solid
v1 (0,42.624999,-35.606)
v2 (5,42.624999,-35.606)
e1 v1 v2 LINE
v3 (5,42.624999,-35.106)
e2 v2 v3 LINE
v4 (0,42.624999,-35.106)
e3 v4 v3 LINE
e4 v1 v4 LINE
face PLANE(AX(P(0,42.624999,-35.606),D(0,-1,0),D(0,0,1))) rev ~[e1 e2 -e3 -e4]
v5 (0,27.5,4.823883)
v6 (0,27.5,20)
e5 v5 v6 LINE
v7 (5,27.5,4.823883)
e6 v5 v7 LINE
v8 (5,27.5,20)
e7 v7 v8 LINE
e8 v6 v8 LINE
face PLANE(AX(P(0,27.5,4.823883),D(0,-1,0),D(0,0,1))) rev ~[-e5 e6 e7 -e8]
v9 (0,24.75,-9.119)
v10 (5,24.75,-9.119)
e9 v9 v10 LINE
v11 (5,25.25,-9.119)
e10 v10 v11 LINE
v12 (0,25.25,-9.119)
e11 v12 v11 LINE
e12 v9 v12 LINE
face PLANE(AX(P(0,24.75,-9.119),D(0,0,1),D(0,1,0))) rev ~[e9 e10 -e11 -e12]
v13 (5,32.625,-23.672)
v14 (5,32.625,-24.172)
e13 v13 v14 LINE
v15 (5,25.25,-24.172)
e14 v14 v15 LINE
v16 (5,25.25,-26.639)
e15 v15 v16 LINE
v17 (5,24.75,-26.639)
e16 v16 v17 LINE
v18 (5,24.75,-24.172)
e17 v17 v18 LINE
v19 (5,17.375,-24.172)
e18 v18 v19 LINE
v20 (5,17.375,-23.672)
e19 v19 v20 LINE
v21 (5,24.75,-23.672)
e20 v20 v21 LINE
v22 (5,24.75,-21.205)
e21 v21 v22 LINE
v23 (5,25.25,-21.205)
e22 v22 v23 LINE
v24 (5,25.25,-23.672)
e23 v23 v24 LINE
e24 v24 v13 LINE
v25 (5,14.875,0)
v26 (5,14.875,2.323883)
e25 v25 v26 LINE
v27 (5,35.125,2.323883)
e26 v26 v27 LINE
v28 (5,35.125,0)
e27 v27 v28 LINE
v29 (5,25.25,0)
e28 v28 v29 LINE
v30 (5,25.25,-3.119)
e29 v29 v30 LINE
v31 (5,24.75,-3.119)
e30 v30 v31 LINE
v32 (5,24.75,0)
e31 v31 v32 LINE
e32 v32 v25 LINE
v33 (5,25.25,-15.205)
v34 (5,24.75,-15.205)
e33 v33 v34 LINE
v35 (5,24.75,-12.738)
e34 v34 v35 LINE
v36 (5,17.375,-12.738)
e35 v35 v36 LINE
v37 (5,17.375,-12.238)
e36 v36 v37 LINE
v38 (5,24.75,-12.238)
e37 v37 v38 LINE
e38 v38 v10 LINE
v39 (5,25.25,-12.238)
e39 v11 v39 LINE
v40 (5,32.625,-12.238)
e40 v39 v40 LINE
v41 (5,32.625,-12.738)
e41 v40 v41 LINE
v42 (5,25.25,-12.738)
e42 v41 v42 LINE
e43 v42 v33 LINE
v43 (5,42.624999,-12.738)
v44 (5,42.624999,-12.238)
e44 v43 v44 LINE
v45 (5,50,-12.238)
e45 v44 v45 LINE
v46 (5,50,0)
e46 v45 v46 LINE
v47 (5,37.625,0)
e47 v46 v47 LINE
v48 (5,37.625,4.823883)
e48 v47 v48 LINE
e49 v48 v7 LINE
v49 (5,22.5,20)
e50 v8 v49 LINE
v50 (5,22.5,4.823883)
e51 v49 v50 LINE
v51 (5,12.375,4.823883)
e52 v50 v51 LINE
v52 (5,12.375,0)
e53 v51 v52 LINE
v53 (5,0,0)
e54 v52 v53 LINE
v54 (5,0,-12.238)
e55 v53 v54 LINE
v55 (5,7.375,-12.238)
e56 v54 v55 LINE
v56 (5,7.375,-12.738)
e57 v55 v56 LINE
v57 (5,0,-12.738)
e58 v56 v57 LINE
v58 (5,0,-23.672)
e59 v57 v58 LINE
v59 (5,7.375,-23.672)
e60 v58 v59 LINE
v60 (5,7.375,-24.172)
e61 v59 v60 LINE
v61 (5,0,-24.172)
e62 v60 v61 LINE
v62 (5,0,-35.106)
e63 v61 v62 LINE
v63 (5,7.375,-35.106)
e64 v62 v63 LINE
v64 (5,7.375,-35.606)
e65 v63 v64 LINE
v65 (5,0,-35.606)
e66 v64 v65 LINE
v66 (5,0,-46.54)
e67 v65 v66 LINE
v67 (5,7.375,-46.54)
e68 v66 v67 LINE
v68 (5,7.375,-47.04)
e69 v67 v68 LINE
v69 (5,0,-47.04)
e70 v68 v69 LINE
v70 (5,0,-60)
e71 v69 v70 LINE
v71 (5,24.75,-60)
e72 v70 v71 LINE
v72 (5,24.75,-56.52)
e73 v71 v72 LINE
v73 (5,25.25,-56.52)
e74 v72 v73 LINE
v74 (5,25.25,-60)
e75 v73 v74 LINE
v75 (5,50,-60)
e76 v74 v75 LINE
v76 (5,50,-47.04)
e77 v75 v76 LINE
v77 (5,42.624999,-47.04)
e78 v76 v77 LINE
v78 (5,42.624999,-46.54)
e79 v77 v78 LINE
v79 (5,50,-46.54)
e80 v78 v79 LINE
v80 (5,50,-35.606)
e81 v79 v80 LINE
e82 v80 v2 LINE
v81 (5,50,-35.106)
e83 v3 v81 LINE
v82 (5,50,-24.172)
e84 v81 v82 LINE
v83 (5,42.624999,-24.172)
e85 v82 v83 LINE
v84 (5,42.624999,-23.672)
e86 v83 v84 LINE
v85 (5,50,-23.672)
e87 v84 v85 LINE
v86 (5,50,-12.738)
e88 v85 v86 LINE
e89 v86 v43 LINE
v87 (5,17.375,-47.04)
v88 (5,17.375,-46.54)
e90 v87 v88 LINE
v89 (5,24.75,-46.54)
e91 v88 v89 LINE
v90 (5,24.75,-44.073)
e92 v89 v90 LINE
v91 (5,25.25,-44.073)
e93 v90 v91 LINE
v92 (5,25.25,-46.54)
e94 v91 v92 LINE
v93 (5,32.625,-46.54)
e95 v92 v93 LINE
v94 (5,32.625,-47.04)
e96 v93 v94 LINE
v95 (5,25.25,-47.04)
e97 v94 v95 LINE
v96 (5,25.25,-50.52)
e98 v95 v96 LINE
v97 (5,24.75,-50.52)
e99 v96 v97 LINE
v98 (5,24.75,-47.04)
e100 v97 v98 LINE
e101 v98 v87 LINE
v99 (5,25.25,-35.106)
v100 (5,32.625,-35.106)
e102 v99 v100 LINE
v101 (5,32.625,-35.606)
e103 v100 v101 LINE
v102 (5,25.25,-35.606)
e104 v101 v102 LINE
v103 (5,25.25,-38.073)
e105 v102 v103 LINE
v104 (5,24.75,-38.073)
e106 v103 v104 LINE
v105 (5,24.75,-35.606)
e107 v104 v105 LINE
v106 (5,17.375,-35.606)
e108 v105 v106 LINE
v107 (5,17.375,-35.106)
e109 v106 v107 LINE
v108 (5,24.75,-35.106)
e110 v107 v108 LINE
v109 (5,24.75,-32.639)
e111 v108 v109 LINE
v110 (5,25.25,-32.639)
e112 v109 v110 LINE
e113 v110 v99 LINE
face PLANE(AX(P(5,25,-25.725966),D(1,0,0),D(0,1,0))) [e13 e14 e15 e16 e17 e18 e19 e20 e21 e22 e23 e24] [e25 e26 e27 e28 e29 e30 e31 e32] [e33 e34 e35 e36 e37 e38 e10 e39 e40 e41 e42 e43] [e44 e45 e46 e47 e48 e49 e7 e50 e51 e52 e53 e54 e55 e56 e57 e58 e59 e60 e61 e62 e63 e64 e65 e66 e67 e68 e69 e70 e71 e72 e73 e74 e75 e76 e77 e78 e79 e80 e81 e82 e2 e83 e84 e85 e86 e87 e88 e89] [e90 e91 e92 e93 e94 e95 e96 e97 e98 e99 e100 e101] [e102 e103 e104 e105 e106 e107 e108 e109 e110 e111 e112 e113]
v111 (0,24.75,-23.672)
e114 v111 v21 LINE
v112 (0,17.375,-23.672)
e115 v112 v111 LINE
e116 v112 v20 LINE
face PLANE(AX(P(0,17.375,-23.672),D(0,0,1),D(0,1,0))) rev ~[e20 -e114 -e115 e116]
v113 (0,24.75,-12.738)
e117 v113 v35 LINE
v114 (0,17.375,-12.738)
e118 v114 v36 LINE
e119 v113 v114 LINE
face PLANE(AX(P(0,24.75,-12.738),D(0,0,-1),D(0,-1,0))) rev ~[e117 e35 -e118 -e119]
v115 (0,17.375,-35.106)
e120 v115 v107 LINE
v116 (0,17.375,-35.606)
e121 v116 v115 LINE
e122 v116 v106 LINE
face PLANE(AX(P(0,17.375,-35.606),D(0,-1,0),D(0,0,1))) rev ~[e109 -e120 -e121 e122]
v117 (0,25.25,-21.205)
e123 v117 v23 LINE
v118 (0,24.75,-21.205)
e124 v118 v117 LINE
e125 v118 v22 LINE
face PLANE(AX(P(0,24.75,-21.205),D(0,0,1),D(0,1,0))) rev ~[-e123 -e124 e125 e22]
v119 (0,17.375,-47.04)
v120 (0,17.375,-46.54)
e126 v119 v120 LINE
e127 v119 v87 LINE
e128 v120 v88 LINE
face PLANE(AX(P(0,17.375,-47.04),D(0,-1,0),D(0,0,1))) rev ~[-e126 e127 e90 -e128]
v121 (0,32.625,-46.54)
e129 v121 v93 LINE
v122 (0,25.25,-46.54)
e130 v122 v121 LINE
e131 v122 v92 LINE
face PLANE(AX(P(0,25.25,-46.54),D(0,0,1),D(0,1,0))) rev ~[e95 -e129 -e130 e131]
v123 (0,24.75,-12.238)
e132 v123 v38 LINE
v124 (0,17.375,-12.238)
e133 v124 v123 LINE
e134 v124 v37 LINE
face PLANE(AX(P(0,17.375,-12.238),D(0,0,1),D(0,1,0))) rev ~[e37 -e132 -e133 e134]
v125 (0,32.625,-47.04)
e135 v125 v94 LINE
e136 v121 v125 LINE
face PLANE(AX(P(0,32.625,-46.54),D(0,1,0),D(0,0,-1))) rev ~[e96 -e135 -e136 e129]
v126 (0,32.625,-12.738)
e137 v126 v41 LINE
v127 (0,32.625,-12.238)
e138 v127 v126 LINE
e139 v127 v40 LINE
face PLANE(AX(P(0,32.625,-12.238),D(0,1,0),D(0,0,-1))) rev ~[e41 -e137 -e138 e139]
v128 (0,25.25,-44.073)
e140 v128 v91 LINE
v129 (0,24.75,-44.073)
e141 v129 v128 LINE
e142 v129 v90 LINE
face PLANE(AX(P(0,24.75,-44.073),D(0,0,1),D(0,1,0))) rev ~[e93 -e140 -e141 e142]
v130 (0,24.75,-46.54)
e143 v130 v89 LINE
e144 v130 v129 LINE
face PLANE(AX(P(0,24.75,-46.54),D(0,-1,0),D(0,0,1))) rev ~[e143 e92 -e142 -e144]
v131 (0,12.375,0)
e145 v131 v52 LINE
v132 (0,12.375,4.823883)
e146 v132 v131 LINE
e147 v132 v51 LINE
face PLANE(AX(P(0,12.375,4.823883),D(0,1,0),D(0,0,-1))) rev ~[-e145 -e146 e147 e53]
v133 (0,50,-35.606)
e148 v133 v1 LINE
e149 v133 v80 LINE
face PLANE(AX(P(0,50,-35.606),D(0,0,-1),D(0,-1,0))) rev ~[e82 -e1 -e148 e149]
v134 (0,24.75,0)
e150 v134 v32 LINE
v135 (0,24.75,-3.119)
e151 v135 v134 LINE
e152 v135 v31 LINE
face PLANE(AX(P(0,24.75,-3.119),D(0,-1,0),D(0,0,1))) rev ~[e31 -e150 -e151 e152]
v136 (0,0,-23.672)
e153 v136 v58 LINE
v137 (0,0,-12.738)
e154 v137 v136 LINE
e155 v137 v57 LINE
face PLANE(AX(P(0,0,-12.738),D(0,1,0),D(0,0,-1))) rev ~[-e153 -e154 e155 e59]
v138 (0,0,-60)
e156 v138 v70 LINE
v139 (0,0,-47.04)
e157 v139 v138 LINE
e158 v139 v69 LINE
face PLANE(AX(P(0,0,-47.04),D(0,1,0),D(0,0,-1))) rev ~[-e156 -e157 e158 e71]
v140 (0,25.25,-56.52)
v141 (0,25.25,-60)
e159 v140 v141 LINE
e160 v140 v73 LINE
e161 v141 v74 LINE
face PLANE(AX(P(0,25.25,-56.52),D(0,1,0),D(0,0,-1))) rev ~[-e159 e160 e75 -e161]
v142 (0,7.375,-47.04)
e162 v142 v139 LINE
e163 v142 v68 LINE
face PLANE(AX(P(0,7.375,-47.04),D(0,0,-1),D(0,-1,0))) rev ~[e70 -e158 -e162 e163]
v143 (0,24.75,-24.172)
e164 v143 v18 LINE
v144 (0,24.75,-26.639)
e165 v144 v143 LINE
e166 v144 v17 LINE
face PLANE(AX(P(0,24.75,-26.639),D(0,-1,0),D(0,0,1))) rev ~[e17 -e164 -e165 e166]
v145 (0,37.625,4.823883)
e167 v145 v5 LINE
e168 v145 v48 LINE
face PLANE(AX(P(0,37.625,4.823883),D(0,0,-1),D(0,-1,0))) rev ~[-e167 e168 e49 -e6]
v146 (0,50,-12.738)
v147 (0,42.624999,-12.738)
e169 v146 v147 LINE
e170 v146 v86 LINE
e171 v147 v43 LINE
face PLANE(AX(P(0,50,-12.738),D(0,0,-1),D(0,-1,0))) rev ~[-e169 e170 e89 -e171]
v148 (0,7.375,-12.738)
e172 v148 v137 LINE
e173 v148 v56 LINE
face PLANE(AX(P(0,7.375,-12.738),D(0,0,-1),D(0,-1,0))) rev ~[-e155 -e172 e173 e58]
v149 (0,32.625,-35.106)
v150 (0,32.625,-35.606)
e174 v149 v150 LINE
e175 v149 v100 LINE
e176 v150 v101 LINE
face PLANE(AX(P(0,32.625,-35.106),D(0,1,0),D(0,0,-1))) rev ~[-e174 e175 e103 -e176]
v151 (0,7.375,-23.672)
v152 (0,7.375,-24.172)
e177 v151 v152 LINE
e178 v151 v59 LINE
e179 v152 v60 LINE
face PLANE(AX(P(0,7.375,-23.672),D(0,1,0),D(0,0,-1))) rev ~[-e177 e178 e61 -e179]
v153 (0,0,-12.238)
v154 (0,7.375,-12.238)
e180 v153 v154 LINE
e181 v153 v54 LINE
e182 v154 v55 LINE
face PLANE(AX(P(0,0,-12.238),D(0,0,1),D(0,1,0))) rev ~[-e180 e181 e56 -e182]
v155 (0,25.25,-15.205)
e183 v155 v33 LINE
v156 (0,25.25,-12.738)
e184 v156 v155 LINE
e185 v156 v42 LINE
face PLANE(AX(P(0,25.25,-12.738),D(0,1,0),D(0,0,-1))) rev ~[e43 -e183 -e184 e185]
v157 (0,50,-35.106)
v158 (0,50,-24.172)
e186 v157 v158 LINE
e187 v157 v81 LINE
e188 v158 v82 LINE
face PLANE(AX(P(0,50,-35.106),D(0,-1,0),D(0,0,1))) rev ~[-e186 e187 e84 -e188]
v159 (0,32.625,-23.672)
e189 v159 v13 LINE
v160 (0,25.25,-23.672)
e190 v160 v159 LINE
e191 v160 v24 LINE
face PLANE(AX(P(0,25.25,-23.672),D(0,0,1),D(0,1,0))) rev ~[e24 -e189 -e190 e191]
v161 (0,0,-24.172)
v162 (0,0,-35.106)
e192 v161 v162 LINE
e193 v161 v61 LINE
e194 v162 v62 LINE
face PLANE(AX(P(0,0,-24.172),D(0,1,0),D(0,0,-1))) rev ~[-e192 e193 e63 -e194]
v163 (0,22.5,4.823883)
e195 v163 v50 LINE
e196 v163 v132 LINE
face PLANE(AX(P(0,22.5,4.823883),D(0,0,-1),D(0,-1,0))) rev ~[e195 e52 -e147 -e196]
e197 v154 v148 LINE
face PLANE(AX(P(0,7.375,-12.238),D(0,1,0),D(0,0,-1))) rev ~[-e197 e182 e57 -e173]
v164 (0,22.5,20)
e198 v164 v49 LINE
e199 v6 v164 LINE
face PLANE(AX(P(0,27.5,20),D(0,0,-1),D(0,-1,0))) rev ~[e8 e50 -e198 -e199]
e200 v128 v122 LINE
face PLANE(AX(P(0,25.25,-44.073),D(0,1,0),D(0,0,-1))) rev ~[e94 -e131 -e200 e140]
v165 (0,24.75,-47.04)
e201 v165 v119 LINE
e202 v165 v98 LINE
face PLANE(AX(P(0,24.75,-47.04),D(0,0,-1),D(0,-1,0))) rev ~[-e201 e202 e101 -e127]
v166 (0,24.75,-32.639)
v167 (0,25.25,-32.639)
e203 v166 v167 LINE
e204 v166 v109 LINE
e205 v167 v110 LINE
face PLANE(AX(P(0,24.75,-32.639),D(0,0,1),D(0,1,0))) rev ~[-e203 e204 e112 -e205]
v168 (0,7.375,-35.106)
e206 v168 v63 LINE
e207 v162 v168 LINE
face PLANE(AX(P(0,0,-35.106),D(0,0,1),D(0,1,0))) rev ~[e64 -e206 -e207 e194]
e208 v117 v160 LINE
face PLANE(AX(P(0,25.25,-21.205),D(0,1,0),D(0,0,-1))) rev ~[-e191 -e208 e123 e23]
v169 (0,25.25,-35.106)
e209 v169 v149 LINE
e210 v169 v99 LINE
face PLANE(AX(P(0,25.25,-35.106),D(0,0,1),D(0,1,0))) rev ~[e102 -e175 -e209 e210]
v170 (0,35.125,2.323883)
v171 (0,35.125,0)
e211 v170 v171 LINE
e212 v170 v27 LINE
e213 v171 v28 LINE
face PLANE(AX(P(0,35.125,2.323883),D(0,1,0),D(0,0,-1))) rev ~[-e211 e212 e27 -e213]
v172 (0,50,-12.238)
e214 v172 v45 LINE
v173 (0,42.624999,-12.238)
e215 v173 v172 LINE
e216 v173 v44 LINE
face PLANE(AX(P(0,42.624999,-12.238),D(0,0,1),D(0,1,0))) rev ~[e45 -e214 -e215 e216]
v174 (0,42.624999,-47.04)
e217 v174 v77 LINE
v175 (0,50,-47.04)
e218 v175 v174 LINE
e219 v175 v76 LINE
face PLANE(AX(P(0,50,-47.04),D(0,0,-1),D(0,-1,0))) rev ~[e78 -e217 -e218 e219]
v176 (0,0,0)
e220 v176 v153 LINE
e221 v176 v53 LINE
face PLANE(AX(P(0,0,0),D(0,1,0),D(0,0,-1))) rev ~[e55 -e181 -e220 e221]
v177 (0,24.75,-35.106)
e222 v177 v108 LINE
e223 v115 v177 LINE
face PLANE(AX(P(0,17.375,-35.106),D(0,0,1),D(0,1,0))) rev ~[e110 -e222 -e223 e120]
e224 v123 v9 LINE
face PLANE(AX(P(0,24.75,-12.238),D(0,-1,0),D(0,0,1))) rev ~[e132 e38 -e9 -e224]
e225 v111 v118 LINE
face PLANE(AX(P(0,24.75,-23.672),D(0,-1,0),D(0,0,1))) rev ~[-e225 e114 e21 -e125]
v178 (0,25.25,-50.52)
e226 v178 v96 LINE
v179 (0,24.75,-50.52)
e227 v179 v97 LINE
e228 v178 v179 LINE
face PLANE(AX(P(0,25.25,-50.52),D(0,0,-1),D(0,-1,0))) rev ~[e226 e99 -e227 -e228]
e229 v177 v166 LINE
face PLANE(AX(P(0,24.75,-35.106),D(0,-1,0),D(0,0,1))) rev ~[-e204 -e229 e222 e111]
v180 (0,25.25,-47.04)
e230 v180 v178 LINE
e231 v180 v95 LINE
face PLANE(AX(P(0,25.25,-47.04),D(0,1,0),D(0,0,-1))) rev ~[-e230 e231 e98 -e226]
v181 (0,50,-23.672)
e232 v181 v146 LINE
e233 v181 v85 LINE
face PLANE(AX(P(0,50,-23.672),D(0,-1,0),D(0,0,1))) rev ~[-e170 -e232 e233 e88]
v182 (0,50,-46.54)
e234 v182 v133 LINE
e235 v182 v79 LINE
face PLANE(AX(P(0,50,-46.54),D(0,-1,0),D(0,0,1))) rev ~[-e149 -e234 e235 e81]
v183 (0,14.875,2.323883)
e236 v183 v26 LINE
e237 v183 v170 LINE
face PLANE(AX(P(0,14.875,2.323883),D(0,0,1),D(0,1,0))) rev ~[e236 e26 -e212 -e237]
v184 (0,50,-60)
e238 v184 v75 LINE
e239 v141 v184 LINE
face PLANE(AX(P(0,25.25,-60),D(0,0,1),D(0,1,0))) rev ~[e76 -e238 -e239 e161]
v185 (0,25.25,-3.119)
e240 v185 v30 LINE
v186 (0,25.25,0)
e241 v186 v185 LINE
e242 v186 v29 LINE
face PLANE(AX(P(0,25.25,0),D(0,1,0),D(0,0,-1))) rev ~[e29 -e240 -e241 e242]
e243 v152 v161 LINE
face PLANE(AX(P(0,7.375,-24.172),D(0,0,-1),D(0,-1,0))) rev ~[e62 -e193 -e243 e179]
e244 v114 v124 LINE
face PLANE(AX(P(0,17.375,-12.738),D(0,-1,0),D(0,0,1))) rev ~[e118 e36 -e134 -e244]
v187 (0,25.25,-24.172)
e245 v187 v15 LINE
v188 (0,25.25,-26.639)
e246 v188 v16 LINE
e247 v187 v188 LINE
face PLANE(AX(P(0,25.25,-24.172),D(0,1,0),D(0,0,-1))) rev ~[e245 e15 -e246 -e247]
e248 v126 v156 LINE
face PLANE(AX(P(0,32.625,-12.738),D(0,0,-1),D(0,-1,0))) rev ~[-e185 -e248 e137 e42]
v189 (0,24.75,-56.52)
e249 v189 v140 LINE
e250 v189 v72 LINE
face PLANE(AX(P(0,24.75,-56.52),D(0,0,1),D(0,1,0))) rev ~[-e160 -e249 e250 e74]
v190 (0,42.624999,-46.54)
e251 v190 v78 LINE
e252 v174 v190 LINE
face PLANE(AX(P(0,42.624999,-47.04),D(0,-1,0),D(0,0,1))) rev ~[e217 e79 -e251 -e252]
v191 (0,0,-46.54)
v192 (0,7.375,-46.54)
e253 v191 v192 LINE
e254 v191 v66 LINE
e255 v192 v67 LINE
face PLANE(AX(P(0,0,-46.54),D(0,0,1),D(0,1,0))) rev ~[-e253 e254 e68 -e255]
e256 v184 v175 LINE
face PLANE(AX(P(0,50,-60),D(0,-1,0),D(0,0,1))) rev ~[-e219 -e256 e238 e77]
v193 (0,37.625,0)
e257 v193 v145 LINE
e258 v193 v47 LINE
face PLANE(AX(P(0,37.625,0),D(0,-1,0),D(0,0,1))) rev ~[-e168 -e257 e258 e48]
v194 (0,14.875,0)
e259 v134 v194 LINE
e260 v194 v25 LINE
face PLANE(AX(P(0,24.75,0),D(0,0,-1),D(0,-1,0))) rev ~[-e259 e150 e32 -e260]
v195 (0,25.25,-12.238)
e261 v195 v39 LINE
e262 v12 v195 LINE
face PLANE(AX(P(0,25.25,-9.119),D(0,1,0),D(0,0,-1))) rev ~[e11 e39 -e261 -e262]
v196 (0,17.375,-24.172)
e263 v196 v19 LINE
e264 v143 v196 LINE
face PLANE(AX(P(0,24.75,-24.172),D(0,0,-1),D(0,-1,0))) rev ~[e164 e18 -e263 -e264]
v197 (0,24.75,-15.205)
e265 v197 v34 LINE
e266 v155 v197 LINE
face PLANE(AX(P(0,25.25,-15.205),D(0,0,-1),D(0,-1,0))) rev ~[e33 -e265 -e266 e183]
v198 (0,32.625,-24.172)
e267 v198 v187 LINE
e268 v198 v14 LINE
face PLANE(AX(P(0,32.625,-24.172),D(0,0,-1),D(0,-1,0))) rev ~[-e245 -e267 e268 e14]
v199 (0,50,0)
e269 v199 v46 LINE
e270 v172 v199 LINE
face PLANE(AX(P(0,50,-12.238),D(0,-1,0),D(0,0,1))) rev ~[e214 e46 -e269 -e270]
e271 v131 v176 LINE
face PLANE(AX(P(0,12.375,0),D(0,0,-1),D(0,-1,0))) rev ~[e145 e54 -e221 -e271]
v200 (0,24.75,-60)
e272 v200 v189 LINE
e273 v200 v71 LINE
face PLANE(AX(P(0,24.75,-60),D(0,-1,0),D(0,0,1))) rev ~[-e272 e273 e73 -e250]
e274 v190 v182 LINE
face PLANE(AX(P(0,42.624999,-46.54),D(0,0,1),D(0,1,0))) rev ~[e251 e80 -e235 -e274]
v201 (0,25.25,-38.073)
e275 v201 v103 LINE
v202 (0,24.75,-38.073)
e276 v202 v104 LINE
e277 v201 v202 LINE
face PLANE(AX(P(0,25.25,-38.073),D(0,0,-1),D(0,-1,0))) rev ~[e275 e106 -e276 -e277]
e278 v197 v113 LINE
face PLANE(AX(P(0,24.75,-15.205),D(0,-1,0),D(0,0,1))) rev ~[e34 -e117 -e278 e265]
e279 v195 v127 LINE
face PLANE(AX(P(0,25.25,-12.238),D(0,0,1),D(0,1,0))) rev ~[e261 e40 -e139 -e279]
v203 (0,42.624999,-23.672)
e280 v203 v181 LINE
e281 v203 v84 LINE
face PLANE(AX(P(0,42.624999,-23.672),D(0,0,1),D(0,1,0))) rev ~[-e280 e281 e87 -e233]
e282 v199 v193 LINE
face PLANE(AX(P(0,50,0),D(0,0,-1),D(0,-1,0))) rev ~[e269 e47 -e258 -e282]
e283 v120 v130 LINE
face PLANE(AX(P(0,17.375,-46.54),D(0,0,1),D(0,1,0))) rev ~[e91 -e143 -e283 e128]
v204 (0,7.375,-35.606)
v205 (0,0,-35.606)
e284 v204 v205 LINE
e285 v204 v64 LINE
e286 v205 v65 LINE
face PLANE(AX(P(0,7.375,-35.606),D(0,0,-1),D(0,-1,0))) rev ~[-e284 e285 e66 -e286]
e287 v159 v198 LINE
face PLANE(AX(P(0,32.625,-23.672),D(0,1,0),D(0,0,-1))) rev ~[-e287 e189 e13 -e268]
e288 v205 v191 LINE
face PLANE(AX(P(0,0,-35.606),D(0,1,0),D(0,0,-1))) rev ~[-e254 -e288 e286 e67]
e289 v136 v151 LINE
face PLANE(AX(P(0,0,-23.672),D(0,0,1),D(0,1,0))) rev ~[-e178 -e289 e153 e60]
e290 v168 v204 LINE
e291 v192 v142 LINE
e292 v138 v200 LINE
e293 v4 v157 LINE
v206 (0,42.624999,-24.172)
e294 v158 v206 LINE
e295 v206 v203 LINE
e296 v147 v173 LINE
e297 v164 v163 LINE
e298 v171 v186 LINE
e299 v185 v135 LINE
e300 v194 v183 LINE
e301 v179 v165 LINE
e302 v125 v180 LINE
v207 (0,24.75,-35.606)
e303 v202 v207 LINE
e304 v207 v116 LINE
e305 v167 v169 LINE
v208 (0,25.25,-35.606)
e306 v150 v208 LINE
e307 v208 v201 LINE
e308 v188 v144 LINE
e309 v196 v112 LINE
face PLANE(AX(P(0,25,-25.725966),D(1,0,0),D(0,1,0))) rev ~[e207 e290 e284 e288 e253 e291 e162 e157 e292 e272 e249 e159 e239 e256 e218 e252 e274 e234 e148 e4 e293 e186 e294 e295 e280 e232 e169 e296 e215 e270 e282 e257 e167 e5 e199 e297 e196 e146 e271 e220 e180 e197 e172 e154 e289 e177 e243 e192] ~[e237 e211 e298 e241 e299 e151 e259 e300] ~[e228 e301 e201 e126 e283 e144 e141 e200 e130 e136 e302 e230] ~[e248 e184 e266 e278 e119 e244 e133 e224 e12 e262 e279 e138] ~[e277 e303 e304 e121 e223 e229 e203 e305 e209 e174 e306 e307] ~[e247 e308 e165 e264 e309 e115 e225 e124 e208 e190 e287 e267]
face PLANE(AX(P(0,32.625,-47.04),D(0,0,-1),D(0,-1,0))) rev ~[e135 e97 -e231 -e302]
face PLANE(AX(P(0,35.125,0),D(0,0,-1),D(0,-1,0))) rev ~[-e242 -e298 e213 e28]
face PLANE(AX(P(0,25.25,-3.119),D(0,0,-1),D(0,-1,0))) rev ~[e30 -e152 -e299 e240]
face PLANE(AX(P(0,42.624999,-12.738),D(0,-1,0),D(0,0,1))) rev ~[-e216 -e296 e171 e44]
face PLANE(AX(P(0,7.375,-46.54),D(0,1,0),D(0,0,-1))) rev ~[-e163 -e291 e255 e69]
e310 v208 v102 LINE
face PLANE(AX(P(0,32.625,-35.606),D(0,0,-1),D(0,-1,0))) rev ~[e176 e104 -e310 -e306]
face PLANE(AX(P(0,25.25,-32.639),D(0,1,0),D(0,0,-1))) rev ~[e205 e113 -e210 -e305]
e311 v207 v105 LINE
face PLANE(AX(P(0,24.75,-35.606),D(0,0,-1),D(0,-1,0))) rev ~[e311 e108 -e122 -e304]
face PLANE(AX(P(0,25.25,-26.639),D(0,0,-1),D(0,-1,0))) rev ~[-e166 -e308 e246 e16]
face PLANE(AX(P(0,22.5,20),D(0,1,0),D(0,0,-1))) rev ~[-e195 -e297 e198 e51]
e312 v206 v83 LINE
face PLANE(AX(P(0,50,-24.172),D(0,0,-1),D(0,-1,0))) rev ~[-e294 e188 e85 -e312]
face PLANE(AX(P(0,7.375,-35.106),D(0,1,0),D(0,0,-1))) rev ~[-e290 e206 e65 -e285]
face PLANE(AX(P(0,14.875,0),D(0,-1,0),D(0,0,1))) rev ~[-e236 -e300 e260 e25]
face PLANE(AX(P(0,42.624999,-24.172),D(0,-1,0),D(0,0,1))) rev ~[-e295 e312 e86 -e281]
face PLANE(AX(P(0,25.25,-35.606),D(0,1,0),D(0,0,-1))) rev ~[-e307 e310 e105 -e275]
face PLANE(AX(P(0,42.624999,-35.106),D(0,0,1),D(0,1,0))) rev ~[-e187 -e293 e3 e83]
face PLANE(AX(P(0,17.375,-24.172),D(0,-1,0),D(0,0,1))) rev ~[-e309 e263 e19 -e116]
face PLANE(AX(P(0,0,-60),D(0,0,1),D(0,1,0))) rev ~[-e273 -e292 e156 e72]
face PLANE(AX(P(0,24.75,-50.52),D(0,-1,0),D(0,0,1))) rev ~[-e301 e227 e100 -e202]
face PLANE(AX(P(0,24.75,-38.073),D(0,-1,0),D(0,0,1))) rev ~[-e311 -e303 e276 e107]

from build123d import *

# Parameters (mm, degrees)
F1_DEPTH = 5


# Not quite as in the source:
# - a feature names something its author has since deleted; it is built from what else it names


with BuildPart() as f1:
    # F0 (on Right) → F1 (new body)
    with BuildSketch(Plane.YZ):
        Polygon((12.375, 0), (0, 0), (0, -12.238), (7.3750000447, -12.238), (7.3750000447, -12.738), (0, -12.738), (0, -23.672), (7.3750000447, -23.672), (7.3750000447, -24.172), (0, -24.172), (0, -35.106), (7.3750000447, -35.106), (7.3750000447, -35.606), (0, -35.606), (0, -46.54), (7.3750000447, -46.54), (7.3750000447, -47.04), (0, -47.04), (0, -60), (24.75, -60), (24.75, -56.52), (25.25, -56.52), (25.25, -60), (50, -60), (50, -47.04), (42.6249988377, -47.04), (42.6249988377, -46.54), (50, -46.54), (50, -35.606), (42.6249988377, -35.606), (42.6249988377, -35.106), (50, -35.106), (50, -24.172), (42.6249988377, -24.172), (42.6249988377, -23.672), (50, -23.672), (50, -12.738), (42.6249988377, -12.738), (42.6249988377, -12.238), (50, -12.238), (50, 0), (37.625, 0), (37.625, 4.8238829523), (27.5, 4.8238829523), (27.5, 9.8238829523), (27.5, 20), (22.5, 20), (22.5, 9.8238829523), (22.5, 4.8238829523), (12.375, 4.8238829523), align=None)
        Polygon((25.25, -44.073), (25.25, -46.54), (32.625, -46.54), (32.625, -47.04), (25.25, -47.04), (25.25, -50.52), (24.75, -50.52), (24.75, -47.04), (17.375, -47.04), (17.375, -46.54), (24.75, -46.54), (24.75, -44.073), align=None, mode=Mode.SUBTRACT)
        Polygon((25.25, -32.639), (25.25, -35.106), (32.625, -35.106), (32.625, -35.606), (25.25, -35.606), (25.25, -38.073), (24.75, -38.073), (24.75, -35.606), (17.375, -35.606), (17.375, -35.106), (24.75, -35.106), (24.75, -32.639), align=None, mode=Mode.SUBTRACT)
        Polygon((25.25, -21.205), (25.25, -23.672), (32.625, -23.672), (32.625, -24.172), (25.25, -24.172), (25.25, -26.639), (24.75, -26.639), (24.75, -24.172), (17.375, -24.172), (17.375, -23.672), (24.75, -23.672), (24.75, -21.205), align=None, mode=Mode.SUBTRACT)
        Polygon((25.25, -9.119), (25.25, -12.238), (32.625, -12.238), (32.625, -12.738), (25.25, -12.738), (25.25, -15.205), (24.75, -15.205), (24.75, -12.738), (17.375, -12.738), (17.375, -12.238), (24.75, -12.238), (24.75, -9.119), align=None, mode=Mode.SUBTRACT)
        Polygon((25.25, -1.304), (25.25, -3.119), (24.75, -3.119), (24.75, 0), (14.875, 0), (14.875, 2.3238829523), (35.125, 2.3238829523), (35.125, 0), (25.25, 0), align=None, mode=Mode.SUBTRACT)
    extrude(amount=F1_DEPTH)


solid = f1.part
